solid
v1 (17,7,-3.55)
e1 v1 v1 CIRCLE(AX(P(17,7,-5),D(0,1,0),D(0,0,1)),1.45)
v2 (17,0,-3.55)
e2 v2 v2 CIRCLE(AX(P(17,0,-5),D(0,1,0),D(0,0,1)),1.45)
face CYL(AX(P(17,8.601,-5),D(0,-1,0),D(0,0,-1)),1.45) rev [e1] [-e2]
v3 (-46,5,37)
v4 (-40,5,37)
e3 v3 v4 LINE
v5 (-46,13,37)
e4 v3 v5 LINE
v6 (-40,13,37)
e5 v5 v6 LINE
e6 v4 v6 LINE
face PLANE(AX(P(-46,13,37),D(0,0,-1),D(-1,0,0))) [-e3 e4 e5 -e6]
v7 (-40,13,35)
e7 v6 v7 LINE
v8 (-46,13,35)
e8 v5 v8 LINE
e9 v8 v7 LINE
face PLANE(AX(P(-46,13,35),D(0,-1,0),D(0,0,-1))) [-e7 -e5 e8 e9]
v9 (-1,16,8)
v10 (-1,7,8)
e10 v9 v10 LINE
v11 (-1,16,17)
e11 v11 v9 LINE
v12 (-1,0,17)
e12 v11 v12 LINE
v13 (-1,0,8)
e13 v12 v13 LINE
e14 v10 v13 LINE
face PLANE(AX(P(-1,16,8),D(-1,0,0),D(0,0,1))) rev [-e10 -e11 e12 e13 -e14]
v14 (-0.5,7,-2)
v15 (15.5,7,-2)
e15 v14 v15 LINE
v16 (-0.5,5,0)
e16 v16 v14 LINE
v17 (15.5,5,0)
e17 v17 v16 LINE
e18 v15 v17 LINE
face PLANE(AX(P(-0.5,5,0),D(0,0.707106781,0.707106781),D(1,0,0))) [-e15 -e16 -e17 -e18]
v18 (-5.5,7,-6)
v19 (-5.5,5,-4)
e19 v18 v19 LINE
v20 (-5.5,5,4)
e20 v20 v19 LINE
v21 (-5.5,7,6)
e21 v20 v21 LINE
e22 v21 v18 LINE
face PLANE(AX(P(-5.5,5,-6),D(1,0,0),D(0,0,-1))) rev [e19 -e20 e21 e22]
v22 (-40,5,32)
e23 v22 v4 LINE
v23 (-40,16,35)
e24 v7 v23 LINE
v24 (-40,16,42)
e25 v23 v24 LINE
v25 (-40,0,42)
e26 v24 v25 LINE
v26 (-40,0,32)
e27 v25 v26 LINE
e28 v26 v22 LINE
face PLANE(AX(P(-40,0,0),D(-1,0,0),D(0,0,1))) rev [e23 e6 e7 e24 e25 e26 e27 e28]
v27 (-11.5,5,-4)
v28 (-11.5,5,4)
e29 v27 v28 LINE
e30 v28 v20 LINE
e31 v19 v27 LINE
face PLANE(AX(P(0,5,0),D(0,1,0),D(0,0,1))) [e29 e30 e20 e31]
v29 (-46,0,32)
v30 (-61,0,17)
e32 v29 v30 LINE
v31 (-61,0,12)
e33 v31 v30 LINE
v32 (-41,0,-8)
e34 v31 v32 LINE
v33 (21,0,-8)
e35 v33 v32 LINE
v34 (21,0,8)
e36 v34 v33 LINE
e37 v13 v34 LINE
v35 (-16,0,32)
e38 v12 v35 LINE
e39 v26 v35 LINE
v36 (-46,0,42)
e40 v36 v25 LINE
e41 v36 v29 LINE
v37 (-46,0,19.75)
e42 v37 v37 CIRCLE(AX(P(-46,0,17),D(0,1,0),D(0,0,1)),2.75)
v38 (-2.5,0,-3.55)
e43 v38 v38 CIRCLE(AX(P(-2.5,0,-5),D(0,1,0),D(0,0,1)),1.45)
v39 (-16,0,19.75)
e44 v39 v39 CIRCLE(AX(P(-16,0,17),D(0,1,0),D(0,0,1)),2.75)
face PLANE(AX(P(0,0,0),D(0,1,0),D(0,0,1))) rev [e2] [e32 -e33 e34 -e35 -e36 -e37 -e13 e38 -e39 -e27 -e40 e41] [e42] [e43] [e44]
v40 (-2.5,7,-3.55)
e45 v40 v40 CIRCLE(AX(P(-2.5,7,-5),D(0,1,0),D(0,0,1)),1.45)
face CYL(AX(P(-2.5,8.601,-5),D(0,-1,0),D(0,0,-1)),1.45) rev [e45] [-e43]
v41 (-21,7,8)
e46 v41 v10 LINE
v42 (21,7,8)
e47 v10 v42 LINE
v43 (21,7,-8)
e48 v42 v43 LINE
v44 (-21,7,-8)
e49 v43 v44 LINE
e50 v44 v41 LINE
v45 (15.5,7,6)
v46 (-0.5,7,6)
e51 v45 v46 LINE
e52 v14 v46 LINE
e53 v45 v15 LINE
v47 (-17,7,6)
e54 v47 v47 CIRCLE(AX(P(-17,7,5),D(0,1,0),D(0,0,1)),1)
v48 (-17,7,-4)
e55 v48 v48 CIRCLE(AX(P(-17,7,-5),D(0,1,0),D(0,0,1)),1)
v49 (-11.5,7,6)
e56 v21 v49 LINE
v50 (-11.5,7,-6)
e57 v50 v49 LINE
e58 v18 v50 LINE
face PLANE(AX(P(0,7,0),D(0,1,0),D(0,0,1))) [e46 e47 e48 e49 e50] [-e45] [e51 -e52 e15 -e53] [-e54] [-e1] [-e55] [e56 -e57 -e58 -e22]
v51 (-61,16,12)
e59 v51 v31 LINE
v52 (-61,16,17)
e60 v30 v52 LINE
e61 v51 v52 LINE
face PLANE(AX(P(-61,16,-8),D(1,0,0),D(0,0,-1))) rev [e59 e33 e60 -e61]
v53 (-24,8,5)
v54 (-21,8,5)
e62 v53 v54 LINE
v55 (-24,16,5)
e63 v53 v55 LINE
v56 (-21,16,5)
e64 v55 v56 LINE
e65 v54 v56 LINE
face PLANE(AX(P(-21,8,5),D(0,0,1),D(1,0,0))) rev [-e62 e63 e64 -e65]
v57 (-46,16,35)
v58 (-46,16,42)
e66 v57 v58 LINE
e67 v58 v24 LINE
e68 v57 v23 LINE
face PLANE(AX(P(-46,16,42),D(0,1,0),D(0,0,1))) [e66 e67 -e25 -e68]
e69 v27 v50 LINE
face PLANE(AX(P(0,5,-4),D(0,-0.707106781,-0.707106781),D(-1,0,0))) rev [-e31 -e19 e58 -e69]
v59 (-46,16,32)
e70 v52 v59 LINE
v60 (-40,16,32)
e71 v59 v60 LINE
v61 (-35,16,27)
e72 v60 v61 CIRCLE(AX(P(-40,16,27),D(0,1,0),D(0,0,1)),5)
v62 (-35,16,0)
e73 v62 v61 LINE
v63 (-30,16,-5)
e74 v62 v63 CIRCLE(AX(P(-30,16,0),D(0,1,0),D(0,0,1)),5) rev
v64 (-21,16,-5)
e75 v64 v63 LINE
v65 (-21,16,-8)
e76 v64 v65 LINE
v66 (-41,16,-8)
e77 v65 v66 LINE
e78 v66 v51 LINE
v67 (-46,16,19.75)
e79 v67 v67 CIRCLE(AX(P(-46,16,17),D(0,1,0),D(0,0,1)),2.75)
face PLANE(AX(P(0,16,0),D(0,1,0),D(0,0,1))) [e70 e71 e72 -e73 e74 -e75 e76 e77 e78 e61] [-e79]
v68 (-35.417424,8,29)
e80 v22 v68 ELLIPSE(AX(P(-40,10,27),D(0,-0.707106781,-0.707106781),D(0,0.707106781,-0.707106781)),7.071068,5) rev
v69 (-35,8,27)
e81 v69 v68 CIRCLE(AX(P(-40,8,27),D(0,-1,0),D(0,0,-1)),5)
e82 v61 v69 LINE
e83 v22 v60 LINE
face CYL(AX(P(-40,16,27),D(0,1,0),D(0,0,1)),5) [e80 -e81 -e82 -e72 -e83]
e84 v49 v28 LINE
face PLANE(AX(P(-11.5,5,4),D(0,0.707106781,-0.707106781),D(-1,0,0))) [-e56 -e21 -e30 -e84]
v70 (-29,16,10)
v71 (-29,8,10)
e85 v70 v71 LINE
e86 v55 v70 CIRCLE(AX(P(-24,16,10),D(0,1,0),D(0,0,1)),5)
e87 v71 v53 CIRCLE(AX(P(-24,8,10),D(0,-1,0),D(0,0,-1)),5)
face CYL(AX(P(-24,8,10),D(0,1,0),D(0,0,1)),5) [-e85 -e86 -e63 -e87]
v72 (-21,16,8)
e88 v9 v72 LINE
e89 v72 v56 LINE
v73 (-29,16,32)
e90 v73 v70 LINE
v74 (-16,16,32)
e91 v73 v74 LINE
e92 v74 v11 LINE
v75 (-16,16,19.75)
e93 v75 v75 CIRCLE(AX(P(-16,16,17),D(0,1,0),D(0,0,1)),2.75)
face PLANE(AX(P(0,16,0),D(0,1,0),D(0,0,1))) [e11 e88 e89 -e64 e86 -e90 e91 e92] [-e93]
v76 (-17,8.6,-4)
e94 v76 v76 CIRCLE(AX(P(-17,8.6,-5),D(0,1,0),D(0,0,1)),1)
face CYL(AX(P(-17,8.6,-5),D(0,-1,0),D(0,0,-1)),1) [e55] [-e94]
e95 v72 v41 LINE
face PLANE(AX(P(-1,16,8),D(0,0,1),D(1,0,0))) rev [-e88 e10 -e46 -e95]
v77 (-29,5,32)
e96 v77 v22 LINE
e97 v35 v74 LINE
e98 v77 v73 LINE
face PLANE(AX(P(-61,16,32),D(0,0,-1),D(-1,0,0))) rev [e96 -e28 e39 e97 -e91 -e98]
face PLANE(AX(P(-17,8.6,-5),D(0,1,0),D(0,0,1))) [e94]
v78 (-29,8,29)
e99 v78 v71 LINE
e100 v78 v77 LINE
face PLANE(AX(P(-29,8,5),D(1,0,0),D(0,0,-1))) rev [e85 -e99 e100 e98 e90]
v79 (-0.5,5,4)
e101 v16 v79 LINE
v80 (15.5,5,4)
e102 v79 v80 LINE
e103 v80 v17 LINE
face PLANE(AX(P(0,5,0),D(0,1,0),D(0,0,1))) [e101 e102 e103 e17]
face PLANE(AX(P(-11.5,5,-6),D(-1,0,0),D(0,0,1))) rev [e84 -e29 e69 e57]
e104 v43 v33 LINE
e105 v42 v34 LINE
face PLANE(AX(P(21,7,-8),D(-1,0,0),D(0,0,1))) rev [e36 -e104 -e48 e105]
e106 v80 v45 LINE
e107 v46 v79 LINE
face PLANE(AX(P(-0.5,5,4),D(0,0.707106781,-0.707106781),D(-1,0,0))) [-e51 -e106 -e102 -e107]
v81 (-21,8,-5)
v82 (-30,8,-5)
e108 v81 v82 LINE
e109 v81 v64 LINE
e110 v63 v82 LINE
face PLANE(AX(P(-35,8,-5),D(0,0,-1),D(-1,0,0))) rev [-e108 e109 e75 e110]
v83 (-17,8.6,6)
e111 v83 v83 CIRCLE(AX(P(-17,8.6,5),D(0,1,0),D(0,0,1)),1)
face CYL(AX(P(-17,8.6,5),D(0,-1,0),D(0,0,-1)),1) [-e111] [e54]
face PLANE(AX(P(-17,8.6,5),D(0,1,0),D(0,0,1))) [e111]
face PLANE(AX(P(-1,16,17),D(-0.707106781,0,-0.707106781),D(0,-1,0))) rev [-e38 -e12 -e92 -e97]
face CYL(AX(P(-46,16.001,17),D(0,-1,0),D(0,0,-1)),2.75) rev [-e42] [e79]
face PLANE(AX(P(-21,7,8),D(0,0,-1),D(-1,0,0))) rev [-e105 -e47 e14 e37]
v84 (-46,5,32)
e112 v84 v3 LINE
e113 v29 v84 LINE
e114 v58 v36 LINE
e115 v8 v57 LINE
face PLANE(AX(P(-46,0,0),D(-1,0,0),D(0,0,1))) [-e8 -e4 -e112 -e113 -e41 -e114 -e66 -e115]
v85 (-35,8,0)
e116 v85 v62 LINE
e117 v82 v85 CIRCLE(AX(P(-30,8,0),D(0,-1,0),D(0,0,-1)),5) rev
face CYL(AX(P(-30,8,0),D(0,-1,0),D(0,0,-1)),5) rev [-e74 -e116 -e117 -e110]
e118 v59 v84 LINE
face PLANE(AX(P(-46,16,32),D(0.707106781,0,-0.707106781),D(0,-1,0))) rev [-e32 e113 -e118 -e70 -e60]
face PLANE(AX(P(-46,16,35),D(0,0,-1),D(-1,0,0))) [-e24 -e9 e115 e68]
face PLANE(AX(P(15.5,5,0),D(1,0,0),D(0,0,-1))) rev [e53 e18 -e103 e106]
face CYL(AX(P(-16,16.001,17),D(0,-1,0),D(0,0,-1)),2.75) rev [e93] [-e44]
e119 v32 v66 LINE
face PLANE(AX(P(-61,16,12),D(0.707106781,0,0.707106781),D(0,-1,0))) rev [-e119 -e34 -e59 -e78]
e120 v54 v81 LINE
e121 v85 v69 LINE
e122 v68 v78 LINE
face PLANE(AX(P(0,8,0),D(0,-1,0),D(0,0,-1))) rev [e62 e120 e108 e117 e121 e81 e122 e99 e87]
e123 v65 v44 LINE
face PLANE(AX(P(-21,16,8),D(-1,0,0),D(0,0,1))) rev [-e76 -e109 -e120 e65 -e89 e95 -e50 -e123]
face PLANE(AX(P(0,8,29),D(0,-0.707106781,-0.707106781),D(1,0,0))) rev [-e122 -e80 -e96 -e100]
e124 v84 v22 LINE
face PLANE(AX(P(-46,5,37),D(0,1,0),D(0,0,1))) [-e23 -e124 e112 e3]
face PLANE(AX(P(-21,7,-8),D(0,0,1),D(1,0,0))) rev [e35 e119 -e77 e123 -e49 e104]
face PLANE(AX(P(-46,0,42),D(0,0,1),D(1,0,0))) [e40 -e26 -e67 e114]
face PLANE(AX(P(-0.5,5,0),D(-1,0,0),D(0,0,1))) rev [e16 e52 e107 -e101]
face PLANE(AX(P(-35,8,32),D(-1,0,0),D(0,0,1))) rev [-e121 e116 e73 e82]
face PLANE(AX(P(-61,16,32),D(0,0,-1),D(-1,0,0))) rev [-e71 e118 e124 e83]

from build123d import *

# Parameters (mm, degrees)
SKETCH1_W           = 42
SKETCH1_H           = 16
BOSS_EXTRUDE1_DEPTH = 7
SKETCH2_R           = 1
BOSS_EXTRUDE2_DEPTH = 1.6
CUT_EXTRUDE1_REACH  = 26.062
SKETCH3_R           = 1.45
BOSS_EXTRUDE3_DEPTH = 16
CUT_EXTRUDE2_REACH  = 72.718
SKETCH5_R           = 2.75
BOSS_EXTRUDE4_DEPTH = 6
CUT_EXTRUDE3_DEPTH  = 8
FILLET1_R           = 5
CHAMFER2_SIZE       = 3
CHAMFER3_SIZE       = 15
CHAMFER5_SIZE       = 20
SKETCH8_W           = 16
SKETCH8_H           = 4
SKETCH8_W_2         = 6
SKETCH8_H_2         = 10
CUT_EXTRUDE4_DEPTH  = 2
CHAMFER6_SIZE       = 2


with BuildPart() as part:
    # Sketch1 → Boss-Extrude1 (new body)
    with BuildSketch(Plane(origin=(0, 0, 0), x_dir=(1, 0, 0), z_dir=(0, 1, 0))):
        Rectangle(SKETCH1_W, SKETCH1_H)
    extrude(amount=BOSS_EXTRUDE1_DEPTH)

    # Sketch2 → Boss-Extrude2 (add)
    with BuildSketch(Plane(origin=(0, 7, 0), x_dir=(1, 0, 0), z_dir=(0, 1, 0))):
        with Locations(Location((-17, 5, 0), (0, 0, 270))):
            Circle(SKETCH2_R)
        with Locations(Location((-17, -5, 0), (0, 0, 270))):
            Circle(SKETCH2_R)
    extrude(amount=BOSS_EXTRUDE2_DEPTH)

    # Sketch3 → Cut-Extrude1 (cut, up to next)
    with BuildSketch(Plane(origin=(0, 0, 0), x_dir=(1, 0, 0), z_dir=(0, 1, 0)), mode=Mode.PRIVATE) as cut_extrude1_sk1:
        with Locations(Location((-2.5, 5, 0), (0, 0, 270))):
            Circle(SKETCH3_R)
    cut_extrude1_tool1 = extrude(cut_extrude1_sk1.sketch, amount=CUT_EXTRUDE1_REACH, mode=Mode.PRIVATE) & part.part
    # Sketch3 → Cut-Extrude1 (cut, up to next)
    with BuildSketch(Plane(origin=(0, 0, 0), x_dir=(1, 0, 0), z_dir=(0, 1, 0)), mode=Mode.PRIVATE) as cut_extrude1_sk2:
        with Locations(Location((17, 5, 0), (0, 0, 270))):
            Circle(SKETCH3_R)
    cut_extrude1_tool2 = extrude(cut_extrude1_sk2.sketch, amount=CUT_EXTRUDE1_REACH, mode=Mode.PRIVATE) & part.part
    add(cut_extrude1_tool1.solids().sort_by_distance((-2.5, 0, -5))[0], mode=Mode.SUBTRACT)
    add(cut_extrude1_tool2.solids().sort_by_distance((17, 0, -5))[0], mode=Mode.SUBTRACT)

    # Sketch4 → Boss-Extrude3 (add)
    with BuildSketch(Plane(origin=(0, 0, 0), x_dir=(1, 0, 0), z_dir=(0, 1, 0))):
        Polygon((-1, -8), (-21, -8), (-21, 8), (-61, 8), (-61, -32), (-1, -32), align=None)
    extrude(amount=BOSS_EXTRUDE3_DEPTH)

    # Sketch5 → Cut-Extrude2 (cut, up to next)
    with BuildSketch(Plane(origin=(0, 0, 0), x_dir=(1, 0, 0), z_dir=(0, 1, 0)), mode=Mode.PRIVATE) as cut_extrude2_sk1:
        with Locations(Location((-46, -17, 0), (0, 0, 270))):
            Circle(SKETCH5_R)
    cut_extrude2_tool1 = extrude(cut_extrude2_sk1.sketch, amount=CUT_EXTRUDE2_REACH, mode=Mode.PRIVATE) & part.part
    # Sketch5 → Cut-Extrude2 (cut, up to next)
    with BuildSketch(Plane(origin=(0, 0, 0), x_dir=(1, 0, 0), z_dir=(0, 1, 0)), mode=Mode.PRIVATE) as cut_extrude2_sk2:
        with Locations(Location((-16, -17, 0), (0, 0, 270))):
            Circle(SKETCH5_R)
    cut_extrude2_tool2 = extrude(cut_extrude2_sk2.sketch, amount=CUT_EXTRUDE2_REACH, mode=Mode.PRIVATE) & part.part
    add(cut_extrude2_tool1.solids().sort_by_distance((-46, 0, 17))[0], mode=Mode.SUBTRACT)
    add(cut_extrude2_tool2.solids().sort_by_distance((-16, 0, 17))[0], mode=Mode.SUBTRACT)

    # Sketch6 → Boss-Extrude4 (add)
    with BuildSketch(Plane(origin=(-40, 0, 0), x_dir=(0, 0, -1), z_dir=(1, 0, 0))):
        Polygon((-32, 0), (-42, 0), (-42, 16), (-35, 16), (-35, 13), (-37, 13), (-37, 5), (-32, 5), align=None)
    extrude(amount=-BOSS_EXTRUDE4_DEPTH)

    # Sketch7 → Cut-Extrude3 (cut)
    with BuildSketch(Plane(origin=(0, 16, 0), x_dir=(1, 0, 0), z_dir=(0, 1, 0))):
        Polygon((-21, 5), (-21, -5), (-29, -5), (-29, -32), (-35, -32), (-35, 5), align=None)
    extrude(amount=-CUT_EXTRUDE3_DEPTH, mode=Mode.SUBTRACT)

    # Fillet1
    fillet1_edges = [part.edges().sort_by_distance(p)[0] for p in [
        (-35, 12, -5),
        (-29, 12, 5),
        (-35, 12, 32),
    ]]
    fillet(fillet1_edges, radius=FILLET1_R)

    # Chamfer2
    chamfer2_edges = [part.edges().sort_by_distance(p)[0] for p in [
        (-34.5, 8, 32),
    ]]
    chamfer(chamfer2_edges, length=CHAMFER2_SIZE)

    # Chamfer3
    chamfer3_edges = [part.edges().sort_by_distance(p)[0] for p in [
        (-1, 8, 32),
        (-61, 8, 32),
    ]]
    chamfer(chamfer3_edges, length=CHAMFER3_SIZE)

    # Chamfer5
    chamfer5_edges = [part.edges().sort_by_distance(p)[0] for p in [
        (-61, 8, -8),
    ]]
    chamfer(chamfer5_edges, length=CHAMFER5_SIZE)

    # Sketch8 → Cut-Extrude4 (cut)
    with BuildSketch(Plane(origin=(0, 7, 0), x_dir=(1, 0, 0), z_dir=(0, 1, 0))):
        with Locations((7.5, -2)):
            Rectangle(SKETCH8_W, SKETCH8_H)
        with Locations((-8.5, 1)):
            Rectangle(SKETCH8_W_2, SKETCH8_H_2)
    extrude(amount=-CUT_EXTRUDE4_DEPTH, mode=Mode.SUBTRACT)

    # Chamfer6
    chamfer6_edges = [part.edges().sort_by_distance(p)[0] for p in [
        (7.5, 7, 4),
        (7.5, 7, 0),
        (-8.5, 7, 4),
        (-8.5, 5, -6),
    ]]
    chamfer(chamfer6_edges, length=CHAMFER6_SIZE - 0.0001)  # a hair under: the kernel refuses the full size


solid = part.part
